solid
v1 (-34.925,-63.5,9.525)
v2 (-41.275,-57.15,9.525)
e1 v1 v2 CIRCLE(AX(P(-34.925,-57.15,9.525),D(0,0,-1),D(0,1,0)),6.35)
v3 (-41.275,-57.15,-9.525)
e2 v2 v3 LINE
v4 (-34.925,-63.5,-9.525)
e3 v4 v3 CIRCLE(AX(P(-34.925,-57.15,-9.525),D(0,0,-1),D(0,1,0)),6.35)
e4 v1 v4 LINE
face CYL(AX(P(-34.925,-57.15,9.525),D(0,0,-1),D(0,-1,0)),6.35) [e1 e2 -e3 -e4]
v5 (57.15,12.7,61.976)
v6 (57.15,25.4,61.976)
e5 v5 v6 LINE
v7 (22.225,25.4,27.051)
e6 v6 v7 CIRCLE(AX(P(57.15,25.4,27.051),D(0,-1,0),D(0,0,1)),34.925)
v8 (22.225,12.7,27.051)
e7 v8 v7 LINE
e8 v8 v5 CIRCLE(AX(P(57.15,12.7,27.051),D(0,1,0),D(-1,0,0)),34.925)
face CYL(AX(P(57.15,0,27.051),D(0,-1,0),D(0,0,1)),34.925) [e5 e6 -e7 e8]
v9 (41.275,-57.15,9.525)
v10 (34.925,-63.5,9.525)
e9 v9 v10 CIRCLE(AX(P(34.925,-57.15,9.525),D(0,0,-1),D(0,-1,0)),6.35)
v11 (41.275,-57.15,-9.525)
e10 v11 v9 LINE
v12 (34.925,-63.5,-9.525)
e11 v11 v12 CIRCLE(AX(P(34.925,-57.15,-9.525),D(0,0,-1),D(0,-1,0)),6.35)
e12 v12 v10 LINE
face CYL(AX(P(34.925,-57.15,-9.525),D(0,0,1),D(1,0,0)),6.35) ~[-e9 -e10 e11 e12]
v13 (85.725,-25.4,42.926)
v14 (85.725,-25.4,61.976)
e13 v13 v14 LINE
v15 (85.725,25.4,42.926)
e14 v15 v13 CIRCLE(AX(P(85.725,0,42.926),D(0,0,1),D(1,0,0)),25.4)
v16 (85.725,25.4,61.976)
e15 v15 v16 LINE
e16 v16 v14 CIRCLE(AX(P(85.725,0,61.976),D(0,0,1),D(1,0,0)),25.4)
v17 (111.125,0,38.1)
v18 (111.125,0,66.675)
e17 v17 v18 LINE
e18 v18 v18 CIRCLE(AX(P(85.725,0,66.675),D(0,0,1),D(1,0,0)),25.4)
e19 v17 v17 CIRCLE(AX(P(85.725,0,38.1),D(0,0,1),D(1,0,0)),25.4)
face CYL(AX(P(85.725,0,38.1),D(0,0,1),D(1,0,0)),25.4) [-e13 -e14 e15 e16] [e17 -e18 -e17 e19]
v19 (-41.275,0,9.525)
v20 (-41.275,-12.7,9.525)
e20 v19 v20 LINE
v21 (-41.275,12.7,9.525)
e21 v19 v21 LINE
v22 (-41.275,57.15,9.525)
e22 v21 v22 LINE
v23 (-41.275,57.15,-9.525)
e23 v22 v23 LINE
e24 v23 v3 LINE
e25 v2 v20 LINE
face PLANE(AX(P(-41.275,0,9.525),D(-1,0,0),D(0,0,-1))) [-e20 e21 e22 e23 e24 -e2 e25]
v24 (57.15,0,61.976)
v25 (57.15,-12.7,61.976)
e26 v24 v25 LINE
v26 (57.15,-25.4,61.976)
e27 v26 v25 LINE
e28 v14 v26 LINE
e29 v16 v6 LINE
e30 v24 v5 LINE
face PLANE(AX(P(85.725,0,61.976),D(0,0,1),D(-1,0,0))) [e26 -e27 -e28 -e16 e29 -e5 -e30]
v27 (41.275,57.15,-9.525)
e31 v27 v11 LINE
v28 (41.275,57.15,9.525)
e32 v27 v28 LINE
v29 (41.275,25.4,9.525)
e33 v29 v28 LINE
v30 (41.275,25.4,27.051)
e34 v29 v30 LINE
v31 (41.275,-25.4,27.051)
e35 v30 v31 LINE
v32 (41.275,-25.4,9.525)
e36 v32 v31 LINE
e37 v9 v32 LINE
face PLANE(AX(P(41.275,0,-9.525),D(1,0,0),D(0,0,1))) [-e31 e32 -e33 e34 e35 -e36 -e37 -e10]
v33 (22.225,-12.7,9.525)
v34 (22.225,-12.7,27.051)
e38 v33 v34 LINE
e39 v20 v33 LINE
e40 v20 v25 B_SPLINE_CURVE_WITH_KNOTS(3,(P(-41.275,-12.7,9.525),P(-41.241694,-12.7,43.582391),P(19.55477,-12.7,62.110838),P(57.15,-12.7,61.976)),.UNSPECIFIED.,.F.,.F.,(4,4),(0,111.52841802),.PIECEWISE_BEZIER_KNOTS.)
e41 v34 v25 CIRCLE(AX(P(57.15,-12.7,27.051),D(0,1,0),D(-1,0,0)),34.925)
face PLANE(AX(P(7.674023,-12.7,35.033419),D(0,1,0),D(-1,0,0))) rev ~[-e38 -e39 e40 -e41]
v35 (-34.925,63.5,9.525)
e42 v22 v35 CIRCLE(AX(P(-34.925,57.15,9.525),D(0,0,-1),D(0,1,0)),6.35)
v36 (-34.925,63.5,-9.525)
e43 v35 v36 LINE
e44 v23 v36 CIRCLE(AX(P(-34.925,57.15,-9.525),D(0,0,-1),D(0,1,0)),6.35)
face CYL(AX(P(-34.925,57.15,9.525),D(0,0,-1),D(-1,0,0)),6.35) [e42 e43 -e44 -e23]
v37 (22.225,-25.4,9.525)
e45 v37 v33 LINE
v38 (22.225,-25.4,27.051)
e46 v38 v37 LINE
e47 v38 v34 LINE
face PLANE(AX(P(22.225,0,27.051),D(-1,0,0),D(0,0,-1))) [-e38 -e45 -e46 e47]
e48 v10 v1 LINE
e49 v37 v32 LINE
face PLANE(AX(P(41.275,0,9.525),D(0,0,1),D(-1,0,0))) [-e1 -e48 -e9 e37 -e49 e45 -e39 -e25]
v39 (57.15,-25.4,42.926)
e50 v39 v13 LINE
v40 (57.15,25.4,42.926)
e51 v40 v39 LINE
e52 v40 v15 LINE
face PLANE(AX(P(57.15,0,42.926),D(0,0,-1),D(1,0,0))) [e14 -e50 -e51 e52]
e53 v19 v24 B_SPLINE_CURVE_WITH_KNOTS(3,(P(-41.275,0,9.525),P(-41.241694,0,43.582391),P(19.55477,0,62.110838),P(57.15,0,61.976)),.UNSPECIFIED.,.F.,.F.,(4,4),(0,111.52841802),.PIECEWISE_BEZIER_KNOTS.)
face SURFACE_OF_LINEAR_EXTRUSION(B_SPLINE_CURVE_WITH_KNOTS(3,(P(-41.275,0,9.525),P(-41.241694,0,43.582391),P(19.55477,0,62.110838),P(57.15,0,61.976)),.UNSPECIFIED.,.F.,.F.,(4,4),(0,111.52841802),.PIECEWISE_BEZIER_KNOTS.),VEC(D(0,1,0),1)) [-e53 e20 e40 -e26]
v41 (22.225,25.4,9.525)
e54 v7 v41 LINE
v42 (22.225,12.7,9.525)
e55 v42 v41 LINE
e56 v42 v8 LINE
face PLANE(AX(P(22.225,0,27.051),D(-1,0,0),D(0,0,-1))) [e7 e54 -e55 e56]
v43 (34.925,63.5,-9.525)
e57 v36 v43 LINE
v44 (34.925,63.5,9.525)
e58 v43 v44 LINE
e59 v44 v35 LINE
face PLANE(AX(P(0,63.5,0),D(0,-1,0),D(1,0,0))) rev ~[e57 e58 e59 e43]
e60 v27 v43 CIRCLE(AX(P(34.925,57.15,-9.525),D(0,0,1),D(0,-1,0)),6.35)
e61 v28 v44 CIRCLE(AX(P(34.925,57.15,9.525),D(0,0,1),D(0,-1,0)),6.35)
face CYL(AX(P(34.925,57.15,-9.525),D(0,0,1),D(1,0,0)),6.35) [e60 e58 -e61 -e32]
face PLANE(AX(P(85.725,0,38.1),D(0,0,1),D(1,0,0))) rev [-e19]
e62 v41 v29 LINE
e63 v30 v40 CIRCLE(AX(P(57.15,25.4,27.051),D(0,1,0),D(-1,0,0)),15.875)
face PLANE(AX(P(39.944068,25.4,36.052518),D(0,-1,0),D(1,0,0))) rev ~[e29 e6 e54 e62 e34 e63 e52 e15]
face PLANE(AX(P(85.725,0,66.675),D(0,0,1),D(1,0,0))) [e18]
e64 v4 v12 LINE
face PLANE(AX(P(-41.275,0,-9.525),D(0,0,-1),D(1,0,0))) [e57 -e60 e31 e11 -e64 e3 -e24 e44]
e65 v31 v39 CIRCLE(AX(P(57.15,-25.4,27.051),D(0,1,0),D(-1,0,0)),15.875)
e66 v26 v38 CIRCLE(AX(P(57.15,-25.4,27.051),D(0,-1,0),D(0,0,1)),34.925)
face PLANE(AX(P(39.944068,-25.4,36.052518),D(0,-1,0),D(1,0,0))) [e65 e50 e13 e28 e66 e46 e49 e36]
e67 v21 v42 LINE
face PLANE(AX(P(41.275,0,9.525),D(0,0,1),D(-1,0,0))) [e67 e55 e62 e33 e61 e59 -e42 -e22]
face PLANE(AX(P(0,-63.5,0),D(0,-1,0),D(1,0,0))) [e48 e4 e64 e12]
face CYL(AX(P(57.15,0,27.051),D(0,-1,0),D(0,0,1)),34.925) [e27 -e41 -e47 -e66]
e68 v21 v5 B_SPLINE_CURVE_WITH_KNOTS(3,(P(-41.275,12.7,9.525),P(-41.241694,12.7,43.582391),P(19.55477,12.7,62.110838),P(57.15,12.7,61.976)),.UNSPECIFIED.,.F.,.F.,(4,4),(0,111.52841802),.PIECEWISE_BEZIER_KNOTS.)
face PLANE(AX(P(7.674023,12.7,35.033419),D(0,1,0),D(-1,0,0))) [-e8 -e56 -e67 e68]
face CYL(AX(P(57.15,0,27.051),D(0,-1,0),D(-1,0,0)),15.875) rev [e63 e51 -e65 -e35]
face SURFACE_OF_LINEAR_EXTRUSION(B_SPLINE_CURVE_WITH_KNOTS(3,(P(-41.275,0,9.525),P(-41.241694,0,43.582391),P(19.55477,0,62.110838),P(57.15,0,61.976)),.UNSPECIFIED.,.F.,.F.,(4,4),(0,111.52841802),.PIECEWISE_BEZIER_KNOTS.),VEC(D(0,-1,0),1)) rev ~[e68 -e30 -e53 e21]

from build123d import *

# Parameters (mm, degrees)
F1_DEPTH = 63.5
F2_DEPTH = 25.4
F3_DEPTH = 12.7
F5_R     = 6.35


with BuildPart() as f1:
    # F0 (on Front) → F1 (new body, symmetric)
    with BuildSketch(Plane.XZ):
        Polygon((-41.275, 9.525), (-41.275, -9.525), (41.275, -9.525), (41.275, 9.525), (22.225, 9.525), align=None)
    extrude(amount=F1_DEPTH, both=True)

    # F0 (on Front) → F2 (join, symmetric)
    with BuildSketch(Plane.XZ):
        with BuildLine():
            Line((22.225, 9.525), (41.275, 9.525))
            Line((41.275, 9.525), (41.275, 27.051))
            ThreePointArc((41.275, 27.051), (45.9246798487, 38.2763201513), (57.15, 42.926))
            Line((57.15, 42.926), (60.325, 42.926))
            Line((60.325, 42.926), (60.325, 61.976))
            Line((60.325, 61.976), (57.15, 61.976))
            ThreePointArc((57.15, 61.976), (32.4542956671, 51.7467043329), (22.225, 27.051))
            Line((22.225, 27.051), (22.225, 9.525))
        make_face()
        Polygon((82.0737038128, 61.976), (60.325, 61.976), (60.325, 42.926), (82.0737038128, 42.926), (85.725, 42.926), (85.725, 61.976), align=None)
    extrude(amount=F2_DEPTH, both=True)

    # F0 (on Front) → F3 (join, symmetric)
    with BuildSketch(Plane.XZ):
        with BuildLine():
            add(Edge.make_bspline(
                [(-41.275, 9.525), (-41.2416942418, 43.5823909938), (19.5547696203, 62.110837549), (57.15, 61.976)],
                knots=[0, 0, 0, 0, 111.5284180198, 111.5284180198, 111.5284180198, 111.5284180198], degree=3))
            Line((-41.275, 9.525), (22.225, 9.525))
            Line((22.225, 9.525), (22.225, 27.051))
            ThreePointArc((22.225, 27.051), (32.4542956671, 51.7467043329), (57.15, 61.976))
        make_face()
    extrude(amount=F3_DEPTH, both=True)

    # F0 (on Front) → F4 (revolve)
    with BuildSketch(Plane.XZ):
        Polygon((111.125, 66.675), (85.725, 66.675), (85.725, 61.976), (85.725, 42.926), (85.725, 38.1), (111.125, 38.1), align=None)
    revolve(axis=Axis((85.725, 0, 52.3875), (0, 0, 1)))

    # F5
    f5_edges = [f1.edges().sort_by_distance(p)[0] for p in [
        (-41.275, -63.5, 0),
        (41.275, -63.5, 0),
        (41.275, 63.5, 0),
        (-41.275, 63.5, 0),
    ]]
    fillet(f5_edges, radius=F5_R)


solid = f1.part
